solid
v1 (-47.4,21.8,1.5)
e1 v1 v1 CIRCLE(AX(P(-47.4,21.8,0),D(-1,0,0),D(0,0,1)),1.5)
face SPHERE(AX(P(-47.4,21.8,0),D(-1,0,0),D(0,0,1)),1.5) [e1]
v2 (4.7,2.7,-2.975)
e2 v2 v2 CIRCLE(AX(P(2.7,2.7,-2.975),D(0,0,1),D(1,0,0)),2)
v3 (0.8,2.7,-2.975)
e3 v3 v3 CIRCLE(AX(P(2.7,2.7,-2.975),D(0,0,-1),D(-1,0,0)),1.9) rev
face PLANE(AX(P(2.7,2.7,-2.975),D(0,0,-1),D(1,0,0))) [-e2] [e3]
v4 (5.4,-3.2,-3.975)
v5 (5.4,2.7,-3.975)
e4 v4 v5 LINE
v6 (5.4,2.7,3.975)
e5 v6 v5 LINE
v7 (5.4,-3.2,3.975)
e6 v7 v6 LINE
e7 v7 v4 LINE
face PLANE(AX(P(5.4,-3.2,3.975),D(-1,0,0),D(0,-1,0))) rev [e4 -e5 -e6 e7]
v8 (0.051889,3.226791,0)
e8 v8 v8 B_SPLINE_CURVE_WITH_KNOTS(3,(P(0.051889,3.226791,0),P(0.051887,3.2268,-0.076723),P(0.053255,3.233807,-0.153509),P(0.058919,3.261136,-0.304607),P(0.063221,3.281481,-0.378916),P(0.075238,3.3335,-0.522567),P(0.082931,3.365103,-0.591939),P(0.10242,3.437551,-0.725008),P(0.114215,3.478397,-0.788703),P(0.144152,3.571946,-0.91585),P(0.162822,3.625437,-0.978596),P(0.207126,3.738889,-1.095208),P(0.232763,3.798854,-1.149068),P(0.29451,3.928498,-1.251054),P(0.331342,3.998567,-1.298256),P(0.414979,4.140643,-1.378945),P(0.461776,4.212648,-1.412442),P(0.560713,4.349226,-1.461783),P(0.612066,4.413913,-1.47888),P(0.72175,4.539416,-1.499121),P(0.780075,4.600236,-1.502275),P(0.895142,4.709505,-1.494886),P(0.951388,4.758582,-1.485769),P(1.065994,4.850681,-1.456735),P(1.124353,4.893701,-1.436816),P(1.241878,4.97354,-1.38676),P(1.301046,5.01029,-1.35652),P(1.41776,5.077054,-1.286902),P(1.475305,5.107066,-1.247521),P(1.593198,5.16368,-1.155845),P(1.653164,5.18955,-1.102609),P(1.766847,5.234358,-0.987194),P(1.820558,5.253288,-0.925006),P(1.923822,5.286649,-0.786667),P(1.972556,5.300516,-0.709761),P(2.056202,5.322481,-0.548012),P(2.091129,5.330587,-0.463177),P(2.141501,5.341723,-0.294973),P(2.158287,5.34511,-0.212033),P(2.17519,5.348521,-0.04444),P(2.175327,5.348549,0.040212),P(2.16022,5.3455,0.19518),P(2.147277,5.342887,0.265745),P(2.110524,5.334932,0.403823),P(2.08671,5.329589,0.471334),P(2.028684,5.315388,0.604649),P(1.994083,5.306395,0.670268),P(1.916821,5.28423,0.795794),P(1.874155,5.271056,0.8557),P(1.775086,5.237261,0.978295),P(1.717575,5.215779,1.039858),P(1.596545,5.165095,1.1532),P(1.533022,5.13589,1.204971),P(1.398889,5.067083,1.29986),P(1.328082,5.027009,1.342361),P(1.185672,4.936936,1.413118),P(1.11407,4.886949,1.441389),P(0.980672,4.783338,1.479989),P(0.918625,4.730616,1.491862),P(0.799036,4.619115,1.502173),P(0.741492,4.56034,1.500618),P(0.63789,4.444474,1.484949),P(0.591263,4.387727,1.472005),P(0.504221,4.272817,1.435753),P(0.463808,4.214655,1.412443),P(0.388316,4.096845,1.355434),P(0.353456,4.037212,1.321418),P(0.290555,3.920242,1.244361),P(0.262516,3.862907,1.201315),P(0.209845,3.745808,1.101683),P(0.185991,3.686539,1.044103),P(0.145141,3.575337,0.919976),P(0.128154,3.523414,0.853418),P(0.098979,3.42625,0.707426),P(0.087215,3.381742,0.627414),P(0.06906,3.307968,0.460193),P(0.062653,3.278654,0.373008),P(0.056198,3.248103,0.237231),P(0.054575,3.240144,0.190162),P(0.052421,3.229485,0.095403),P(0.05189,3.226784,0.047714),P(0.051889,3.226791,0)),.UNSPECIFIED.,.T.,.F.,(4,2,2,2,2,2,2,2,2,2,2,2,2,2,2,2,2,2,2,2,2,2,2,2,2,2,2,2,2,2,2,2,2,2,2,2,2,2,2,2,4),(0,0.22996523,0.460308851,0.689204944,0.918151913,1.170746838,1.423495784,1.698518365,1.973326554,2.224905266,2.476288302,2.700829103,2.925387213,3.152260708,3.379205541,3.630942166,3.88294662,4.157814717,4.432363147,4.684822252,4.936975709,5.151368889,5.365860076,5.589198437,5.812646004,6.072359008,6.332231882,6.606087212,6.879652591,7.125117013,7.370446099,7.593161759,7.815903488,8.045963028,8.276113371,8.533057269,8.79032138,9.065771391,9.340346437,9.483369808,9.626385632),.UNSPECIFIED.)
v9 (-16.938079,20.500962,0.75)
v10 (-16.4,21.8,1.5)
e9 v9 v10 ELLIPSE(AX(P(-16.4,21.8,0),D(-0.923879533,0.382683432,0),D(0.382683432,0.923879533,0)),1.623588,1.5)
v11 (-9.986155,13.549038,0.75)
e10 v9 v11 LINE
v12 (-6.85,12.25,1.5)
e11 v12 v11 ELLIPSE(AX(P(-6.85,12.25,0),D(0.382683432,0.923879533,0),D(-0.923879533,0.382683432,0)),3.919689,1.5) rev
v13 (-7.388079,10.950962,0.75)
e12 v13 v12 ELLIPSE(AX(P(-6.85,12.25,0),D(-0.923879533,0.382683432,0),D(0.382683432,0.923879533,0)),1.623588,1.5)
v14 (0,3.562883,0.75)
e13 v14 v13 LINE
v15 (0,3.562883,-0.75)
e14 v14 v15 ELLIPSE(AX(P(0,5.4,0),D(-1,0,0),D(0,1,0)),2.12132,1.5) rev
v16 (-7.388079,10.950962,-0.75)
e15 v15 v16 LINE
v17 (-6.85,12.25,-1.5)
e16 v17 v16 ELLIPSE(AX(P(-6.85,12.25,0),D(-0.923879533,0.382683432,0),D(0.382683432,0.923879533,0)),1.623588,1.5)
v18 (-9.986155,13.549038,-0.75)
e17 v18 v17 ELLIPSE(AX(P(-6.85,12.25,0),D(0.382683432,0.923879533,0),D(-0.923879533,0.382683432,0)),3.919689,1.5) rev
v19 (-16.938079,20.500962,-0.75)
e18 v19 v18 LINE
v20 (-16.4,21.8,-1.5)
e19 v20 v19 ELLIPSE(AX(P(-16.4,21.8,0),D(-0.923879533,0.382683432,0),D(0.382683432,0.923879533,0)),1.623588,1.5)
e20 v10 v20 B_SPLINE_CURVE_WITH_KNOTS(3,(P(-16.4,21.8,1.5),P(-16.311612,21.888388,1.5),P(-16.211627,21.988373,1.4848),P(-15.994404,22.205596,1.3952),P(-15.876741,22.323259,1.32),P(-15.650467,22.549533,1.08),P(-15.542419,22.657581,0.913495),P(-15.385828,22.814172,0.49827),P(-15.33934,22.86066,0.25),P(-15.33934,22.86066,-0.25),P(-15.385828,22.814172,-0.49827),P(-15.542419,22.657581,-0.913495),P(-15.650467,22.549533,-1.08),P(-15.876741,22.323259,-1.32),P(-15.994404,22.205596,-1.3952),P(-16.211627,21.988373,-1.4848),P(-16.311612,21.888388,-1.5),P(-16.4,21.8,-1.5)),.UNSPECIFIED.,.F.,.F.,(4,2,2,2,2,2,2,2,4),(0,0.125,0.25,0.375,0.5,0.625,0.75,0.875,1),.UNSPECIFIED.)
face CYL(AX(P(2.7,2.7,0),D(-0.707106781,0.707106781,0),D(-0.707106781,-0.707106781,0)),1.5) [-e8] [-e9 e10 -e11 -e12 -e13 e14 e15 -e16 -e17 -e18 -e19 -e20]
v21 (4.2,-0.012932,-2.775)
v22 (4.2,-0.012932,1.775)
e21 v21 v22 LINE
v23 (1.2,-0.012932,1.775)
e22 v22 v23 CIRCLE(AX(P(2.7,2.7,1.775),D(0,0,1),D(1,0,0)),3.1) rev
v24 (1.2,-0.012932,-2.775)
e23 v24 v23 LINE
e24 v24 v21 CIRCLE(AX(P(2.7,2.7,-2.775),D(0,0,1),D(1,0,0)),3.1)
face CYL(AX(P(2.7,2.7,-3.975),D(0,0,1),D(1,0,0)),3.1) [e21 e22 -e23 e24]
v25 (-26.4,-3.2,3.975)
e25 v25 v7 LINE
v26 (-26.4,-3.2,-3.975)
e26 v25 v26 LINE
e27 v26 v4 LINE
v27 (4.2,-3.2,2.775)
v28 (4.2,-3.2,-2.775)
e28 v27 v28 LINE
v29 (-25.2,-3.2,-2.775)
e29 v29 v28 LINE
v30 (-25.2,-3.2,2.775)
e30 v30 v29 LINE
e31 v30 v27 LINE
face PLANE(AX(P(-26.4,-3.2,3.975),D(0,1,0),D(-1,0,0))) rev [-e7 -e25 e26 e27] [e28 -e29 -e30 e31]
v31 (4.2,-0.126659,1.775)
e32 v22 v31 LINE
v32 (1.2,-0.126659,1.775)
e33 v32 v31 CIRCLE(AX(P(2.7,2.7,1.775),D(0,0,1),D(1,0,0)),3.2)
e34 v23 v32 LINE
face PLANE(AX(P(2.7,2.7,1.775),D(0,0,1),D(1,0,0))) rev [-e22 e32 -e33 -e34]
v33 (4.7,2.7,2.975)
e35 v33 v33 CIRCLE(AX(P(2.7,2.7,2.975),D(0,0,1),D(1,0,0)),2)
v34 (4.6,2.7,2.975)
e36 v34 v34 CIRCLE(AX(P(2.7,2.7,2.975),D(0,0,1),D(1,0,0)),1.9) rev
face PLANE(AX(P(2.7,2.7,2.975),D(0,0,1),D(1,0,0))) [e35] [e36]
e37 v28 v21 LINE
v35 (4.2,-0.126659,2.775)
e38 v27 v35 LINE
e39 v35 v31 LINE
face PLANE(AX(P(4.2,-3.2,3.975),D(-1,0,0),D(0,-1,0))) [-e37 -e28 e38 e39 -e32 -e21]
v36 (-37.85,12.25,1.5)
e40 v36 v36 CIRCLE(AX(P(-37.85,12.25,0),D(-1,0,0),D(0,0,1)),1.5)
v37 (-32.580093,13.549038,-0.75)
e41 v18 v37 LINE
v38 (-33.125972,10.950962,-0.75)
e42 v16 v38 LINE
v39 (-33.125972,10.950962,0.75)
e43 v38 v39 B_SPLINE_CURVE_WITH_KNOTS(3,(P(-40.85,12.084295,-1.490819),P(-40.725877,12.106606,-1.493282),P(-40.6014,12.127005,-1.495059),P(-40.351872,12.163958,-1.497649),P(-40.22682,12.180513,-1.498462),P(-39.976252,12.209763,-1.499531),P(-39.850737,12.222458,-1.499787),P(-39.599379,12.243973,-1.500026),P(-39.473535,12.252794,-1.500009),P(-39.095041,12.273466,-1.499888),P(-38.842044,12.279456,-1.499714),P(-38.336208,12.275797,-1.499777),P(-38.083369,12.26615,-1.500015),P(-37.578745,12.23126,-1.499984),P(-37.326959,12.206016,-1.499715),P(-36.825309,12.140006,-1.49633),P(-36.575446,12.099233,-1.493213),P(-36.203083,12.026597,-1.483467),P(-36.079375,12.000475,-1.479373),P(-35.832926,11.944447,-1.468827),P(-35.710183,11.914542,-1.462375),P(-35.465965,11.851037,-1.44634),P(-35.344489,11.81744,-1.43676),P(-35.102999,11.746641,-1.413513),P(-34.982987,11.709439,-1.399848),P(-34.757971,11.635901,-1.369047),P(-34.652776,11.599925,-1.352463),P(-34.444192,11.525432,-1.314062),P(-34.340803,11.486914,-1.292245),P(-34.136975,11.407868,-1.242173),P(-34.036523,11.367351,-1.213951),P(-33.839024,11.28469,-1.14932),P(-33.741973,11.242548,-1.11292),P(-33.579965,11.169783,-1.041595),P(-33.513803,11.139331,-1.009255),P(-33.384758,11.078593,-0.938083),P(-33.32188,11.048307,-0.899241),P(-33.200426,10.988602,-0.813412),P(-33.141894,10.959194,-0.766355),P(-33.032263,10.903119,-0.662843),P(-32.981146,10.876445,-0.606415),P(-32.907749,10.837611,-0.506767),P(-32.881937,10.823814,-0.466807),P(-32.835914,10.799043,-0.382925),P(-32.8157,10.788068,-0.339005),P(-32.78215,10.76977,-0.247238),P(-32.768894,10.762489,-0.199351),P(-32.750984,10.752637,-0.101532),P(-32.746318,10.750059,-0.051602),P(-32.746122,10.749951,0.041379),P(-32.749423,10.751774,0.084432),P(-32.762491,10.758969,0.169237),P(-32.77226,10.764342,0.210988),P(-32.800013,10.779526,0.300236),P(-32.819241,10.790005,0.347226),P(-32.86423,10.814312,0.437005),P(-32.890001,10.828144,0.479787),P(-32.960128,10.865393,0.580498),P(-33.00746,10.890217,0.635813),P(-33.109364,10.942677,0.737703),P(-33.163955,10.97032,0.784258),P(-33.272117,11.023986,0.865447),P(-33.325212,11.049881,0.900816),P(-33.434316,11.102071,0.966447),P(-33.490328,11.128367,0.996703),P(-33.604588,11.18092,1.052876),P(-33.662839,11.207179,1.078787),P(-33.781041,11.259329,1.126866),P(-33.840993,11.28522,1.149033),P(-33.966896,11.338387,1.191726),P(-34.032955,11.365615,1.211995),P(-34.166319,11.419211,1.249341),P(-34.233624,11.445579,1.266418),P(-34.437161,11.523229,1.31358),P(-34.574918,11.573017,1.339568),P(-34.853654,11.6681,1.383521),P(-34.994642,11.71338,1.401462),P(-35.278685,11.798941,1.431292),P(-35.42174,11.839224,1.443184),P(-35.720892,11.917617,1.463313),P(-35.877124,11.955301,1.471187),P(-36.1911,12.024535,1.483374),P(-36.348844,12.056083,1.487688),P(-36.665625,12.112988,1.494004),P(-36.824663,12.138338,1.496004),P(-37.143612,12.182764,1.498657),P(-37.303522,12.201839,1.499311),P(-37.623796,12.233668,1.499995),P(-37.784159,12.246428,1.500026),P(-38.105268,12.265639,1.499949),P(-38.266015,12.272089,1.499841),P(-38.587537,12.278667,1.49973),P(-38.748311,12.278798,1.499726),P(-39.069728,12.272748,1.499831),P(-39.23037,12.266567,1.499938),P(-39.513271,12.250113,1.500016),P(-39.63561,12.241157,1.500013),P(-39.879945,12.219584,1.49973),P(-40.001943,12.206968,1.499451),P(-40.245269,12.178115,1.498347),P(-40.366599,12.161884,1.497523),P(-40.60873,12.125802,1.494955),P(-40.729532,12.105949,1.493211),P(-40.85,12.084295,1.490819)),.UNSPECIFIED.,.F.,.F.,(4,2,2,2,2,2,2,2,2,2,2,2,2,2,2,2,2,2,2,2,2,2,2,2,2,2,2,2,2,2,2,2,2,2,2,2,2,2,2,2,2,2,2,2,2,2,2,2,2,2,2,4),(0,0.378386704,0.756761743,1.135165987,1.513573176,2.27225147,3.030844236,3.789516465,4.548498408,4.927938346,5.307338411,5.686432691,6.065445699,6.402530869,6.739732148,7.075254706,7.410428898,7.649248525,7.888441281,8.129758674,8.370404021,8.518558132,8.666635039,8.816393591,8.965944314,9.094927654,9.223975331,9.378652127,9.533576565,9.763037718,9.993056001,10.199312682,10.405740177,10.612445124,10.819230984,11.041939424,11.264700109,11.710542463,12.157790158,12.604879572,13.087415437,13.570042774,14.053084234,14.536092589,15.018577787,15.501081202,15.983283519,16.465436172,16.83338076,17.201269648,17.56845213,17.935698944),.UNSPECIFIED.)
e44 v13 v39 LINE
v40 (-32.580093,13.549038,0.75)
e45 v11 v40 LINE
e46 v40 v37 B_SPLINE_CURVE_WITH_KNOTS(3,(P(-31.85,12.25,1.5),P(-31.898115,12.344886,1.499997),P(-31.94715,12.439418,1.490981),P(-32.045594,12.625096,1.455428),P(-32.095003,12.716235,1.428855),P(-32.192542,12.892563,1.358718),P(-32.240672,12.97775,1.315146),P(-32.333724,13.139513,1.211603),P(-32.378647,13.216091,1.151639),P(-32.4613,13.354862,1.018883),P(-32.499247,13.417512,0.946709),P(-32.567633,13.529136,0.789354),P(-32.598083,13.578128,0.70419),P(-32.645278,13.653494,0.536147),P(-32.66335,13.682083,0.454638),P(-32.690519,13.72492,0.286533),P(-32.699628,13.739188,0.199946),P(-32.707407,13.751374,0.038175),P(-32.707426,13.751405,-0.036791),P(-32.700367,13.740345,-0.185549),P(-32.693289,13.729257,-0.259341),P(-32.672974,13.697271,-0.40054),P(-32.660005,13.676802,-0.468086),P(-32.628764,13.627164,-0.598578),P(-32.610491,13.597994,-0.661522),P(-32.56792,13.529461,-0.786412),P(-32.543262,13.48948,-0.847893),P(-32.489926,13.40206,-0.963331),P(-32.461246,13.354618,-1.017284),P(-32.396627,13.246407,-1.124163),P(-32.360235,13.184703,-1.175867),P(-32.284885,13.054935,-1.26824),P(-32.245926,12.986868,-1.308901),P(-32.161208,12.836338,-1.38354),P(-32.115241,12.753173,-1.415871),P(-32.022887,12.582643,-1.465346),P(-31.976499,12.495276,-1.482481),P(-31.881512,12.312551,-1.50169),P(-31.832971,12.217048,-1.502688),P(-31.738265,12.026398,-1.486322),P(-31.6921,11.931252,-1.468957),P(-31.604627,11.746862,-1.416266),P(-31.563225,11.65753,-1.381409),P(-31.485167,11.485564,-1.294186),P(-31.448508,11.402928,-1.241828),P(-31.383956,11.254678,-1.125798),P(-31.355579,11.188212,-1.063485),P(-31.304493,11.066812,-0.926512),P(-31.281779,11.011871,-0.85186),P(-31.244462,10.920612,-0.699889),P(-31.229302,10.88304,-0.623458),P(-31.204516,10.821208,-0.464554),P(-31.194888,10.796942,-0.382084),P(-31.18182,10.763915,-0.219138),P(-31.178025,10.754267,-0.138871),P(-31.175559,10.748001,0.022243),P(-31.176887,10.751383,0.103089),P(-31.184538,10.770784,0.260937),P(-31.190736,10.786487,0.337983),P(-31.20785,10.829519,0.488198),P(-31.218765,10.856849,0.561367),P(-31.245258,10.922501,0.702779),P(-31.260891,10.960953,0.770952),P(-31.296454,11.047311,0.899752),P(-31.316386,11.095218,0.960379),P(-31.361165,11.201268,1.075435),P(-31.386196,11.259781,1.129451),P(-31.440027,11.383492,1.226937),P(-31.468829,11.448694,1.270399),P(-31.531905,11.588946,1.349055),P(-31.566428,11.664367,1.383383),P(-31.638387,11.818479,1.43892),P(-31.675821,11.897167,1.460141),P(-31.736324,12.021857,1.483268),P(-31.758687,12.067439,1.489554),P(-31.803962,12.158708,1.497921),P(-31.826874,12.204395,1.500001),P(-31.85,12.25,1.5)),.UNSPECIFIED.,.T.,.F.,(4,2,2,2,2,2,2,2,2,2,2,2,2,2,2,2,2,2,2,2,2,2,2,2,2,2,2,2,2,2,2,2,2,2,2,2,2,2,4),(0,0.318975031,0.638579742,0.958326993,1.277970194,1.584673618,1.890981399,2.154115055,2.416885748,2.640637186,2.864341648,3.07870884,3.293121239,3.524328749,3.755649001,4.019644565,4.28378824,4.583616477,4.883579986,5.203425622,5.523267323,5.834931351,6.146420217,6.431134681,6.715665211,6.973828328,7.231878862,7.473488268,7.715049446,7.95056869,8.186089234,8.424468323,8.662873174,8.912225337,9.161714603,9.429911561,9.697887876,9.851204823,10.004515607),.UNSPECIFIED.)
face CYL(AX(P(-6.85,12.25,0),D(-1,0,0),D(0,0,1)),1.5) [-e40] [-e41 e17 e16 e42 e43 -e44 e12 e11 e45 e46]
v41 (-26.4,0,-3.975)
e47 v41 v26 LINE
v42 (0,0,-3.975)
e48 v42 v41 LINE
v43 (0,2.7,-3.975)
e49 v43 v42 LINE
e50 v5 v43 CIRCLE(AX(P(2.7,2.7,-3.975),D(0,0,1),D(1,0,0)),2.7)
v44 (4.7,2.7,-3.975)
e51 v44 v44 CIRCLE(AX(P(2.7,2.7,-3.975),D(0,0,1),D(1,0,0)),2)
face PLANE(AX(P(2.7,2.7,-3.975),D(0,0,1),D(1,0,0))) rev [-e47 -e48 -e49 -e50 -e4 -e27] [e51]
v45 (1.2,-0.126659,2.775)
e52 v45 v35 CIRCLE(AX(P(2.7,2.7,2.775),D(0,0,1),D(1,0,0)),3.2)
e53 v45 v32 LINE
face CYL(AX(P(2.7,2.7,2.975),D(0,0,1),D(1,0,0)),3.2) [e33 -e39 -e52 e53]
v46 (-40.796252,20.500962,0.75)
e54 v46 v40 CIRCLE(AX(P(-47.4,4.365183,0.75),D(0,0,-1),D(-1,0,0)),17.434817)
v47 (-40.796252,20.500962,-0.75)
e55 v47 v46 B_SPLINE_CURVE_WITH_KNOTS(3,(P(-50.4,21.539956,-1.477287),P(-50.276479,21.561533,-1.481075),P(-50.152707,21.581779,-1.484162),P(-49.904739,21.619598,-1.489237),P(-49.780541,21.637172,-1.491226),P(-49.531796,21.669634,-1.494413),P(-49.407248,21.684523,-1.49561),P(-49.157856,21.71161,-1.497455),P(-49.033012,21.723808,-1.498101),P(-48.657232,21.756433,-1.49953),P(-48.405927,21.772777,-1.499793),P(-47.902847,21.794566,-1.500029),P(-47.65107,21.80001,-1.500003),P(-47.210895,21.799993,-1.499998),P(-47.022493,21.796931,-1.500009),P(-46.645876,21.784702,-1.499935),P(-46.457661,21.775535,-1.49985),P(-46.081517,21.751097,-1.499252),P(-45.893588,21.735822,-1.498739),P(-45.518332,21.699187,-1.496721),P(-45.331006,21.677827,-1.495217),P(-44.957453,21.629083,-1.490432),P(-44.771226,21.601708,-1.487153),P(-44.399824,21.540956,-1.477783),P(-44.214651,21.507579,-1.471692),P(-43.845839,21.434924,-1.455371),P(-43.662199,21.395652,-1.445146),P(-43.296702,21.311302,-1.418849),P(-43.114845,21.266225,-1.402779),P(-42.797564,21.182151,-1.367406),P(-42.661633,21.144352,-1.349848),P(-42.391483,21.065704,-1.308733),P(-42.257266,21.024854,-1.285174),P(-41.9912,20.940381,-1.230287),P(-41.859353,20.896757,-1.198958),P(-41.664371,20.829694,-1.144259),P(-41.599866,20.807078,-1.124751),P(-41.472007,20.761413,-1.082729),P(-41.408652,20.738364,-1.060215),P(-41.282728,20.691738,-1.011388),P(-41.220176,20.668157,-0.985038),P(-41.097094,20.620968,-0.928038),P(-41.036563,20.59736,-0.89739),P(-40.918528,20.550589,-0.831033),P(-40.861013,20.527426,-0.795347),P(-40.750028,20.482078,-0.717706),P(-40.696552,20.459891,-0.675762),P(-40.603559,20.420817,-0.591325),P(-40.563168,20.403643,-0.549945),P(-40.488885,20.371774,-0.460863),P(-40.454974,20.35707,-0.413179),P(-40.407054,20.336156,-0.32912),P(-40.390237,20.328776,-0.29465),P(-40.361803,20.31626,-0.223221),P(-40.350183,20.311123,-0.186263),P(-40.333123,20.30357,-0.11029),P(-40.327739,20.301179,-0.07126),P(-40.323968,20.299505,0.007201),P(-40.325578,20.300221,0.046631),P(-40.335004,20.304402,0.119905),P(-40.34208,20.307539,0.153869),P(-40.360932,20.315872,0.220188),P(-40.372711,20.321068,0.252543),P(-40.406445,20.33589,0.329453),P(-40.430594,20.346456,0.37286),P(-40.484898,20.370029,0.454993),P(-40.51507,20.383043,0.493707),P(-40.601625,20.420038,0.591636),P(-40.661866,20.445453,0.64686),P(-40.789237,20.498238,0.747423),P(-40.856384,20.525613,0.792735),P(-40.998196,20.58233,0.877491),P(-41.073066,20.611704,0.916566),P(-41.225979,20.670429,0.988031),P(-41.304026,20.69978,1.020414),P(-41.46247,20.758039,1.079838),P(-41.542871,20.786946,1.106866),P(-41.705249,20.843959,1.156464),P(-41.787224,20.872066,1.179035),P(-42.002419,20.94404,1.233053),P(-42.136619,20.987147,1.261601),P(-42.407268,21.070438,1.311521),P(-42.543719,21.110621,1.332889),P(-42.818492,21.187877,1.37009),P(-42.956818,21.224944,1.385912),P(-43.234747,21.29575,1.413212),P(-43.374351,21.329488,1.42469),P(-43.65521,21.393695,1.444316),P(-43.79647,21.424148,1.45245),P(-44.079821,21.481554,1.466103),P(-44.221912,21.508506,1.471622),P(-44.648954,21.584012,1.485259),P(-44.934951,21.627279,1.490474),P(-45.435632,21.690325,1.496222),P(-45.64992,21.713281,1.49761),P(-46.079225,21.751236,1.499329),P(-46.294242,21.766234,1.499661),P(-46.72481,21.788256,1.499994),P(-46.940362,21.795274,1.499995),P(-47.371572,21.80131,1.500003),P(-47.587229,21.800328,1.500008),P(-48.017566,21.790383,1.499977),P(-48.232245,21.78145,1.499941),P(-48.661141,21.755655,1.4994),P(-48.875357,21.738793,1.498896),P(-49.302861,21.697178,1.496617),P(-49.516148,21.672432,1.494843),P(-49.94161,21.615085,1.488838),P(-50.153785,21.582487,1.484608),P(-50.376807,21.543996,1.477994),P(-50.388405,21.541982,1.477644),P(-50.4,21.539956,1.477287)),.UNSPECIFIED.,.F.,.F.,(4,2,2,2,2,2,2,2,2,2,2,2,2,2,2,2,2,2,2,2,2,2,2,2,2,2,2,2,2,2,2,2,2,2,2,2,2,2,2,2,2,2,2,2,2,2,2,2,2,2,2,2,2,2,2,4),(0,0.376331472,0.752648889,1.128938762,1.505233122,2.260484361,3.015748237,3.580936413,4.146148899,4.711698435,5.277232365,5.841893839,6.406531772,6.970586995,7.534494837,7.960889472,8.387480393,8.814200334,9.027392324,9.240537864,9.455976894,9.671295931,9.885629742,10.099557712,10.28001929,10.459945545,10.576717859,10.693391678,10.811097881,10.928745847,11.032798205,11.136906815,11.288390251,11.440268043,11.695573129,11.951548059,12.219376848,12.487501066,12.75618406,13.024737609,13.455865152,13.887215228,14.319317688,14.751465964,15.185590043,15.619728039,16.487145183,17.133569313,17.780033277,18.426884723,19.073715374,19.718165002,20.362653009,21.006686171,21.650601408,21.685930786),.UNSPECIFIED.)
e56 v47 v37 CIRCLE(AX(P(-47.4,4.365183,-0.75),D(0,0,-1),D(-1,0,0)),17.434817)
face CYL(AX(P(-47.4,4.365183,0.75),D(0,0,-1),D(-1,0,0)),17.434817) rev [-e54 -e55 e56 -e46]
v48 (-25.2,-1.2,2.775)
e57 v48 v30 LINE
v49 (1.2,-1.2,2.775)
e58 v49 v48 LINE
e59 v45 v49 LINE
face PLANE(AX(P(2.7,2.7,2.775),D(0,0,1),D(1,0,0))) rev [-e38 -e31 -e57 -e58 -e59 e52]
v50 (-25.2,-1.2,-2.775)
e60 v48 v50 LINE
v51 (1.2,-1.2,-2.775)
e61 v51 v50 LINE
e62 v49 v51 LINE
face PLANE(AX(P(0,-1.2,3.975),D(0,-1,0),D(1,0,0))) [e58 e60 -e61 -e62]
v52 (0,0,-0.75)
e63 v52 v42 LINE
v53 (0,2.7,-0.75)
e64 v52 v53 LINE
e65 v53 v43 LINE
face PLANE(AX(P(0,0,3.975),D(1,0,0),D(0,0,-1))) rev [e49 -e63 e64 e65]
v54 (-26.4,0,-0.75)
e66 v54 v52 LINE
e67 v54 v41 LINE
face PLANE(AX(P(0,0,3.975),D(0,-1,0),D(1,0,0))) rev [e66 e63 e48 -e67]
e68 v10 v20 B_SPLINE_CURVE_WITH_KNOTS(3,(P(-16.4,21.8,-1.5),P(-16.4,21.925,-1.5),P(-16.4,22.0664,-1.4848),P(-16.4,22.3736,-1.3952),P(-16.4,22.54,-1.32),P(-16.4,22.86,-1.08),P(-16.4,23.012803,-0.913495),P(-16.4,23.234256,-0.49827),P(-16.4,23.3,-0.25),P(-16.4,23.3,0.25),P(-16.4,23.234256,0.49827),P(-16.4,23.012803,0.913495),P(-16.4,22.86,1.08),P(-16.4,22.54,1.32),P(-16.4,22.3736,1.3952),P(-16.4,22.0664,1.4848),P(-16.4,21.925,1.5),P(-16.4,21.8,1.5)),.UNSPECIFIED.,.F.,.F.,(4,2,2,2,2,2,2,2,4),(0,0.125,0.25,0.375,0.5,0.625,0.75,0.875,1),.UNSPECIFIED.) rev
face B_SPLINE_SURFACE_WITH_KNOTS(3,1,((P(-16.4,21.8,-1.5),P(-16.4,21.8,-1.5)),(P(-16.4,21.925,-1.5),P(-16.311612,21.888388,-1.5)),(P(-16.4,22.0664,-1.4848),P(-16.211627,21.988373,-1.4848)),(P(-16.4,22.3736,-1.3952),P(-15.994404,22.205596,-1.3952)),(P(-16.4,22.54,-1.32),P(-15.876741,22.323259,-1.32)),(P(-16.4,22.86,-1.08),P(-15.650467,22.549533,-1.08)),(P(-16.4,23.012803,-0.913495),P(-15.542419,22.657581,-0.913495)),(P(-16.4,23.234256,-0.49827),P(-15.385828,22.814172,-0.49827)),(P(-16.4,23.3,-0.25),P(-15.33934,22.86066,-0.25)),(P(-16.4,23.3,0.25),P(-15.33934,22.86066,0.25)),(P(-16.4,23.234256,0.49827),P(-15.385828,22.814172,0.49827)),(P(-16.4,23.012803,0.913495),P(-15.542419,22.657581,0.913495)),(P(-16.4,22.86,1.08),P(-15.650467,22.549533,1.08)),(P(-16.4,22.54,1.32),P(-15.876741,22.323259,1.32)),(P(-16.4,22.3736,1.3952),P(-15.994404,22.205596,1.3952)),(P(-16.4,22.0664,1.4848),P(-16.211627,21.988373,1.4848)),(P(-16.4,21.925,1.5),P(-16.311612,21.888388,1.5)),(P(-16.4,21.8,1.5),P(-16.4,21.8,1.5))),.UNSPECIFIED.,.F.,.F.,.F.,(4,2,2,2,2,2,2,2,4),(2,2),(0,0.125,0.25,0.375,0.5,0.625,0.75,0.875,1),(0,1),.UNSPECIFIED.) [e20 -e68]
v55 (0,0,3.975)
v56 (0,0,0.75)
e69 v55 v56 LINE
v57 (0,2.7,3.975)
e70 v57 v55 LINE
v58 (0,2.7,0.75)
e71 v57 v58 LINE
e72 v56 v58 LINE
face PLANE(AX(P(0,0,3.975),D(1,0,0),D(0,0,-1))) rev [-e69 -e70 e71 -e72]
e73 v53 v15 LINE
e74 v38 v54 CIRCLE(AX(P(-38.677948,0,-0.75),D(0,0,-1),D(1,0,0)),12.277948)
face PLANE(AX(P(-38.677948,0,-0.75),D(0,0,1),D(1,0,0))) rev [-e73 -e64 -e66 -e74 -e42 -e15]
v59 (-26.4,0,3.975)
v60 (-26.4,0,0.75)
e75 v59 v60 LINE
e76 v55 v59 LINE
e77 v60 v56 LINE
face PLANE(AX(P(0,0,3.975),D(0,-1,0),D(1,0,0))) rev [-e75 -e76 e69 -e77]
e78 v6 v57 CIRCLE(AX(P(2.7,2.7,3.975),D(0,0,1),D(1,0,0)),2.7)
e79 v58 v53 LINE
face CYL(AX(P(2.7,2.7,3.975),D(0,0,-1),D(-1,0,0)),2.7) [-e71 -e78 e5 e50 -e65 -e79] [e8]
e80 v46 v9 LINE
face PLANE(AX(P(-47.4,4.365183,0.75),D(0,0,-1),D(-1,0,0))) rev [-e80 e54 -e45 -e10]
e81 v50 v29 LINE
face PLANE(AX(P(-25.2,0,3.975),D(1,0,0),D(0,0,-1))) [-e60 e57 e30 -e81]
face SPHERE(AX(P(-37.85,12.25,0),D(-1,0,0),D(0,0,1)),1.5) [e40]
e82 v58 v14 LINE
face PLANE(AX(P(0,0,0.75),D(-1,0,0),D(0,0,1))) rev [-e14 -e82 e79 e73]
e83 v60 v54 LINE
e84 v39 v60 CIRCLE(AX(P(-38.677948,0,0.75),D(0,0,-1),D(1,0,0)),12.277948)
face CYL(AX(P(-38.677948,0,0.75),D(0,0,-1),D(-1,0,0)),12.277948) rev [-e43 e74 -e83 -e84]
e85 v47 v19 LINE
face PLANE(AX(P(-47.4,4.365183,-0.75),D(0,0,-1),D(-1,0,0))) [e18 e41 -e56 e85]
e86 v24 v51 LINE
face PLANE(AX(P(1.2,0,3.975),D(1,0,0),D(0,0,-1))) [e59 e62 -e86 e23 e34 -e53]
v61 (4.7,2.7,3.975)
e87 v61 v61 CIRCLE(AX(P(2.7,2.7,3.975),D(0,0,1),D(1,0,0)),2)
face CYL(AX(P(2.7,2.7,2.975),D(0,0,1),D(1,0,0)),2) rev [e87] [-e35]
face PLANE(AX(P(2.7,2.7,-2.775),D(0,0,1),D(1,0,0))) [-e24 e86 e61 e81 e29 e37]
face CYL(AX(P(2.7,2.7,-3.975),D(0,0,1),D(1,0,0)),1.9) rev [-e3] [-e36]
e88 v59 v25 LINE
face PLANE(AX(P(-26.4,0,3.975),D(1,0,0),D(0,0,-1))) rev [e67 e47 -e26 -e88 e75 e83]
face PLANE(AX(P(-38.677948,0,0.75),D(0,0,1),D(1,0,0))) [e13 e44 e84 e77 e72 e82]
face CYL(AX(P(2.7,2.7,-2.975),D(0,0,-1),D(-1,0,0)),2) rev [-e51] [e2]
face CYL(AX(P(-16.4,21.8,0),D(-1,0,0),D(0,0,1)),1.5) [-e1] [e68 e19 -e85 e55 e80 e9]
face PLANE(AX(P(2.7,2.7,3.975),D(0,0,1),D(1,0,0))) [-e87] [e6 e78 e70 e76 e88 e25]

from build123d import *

# Parameters (mm, degrees)
BOSS_EXTRUDE1_DEPTH = 3.975
SKETCH2_R           = 1.9
CUT_EXTRUDE1_DEPTH  = 29.094883876
SKETCH3_R           = 2
CUT_EXTRUDE2_DEPTH  = 1
SHELL4_START        = -2.775
SHELL4_DEPTH        = 5.55
SHELL4_2_DEPTH      = 4.55
SWEEP2_PROFILE_R    = 1.5
SWEEP3_PROFILE_R    = 1.5
SWEEP4_PROFILE_R    = 1.5
DOME1_FACE_RADIUS   = 1.5
DOME1_HEIGHT        = 1.5
DOME2_FACE_RADIUS   = 1.5
DOME2_HEIGHT        = 1.5
BOSS_EXTRUDE3_DEPTH = 0.75
BOSS_EXTRUDE4_DEPTH = 0.75
SKETCH63_R          = 1.9
CUT_EXTRUDE4_DEPTH  = 55.747625576


with BuildPart() as part:
    # Sketch1 → Boss-Extrude1 (new, symmetric)
    with BuildSketch(Plane.XY):
        with BuildLine():
            Line((0, 0), (-26.4, 0))
            Line((-26.4, 0), (-26.4, -3.2))
            Line((-26.4, -3.2), (5.4, -3.2))
            Line((5.4, -3.2), (5.4, 2.7))
            ThreePointArc((5.4, 2.7), (2.7, 5.4), (0, 2.7))
            Line((0, 2.7), (0, 0))
        make_face()
    extrude(amount=BOSS_EXTRUDE1_DEPTH, both=True)

    # Sketch2 → Cut-Extrude1 (cut, through all)
    with BuildSketch(Plane.XY.offset(3.975)):
        with Locations((2.7, 2.7)):
            Circle(SKETCH2_R)
    extrude(amount=-CUT_EXTRUDE1_DEPTH, mode=Mode.SUBTRACT)

    # Sketch3 → Cut-Extrude2 (cut)
    with BuildSketch(Plane.XY.offset(3.975)):
        with Locations((2.7, 2.7)):
            Circle(SKETCH3_R)
    cut_extrude2 = extrude(amount=-CUT_EXTRUDE2_DEPTH, mode=Mode.SUBTRACT)

    # Shell4: read off the stored shape, not the designer's step
    # Shell4 outline → Shell4 (cut)
    with BuildSketch(Plane.XY.offset(SHELL4_START)):
        with BuildLine():
            Line((1.2, -0.126658805), (1.2, -1.2))
            Line((1.2, -1.2), (-25.2, -1.2))
            Line((-25.2, -1.2), (-25.2, -3.2))
            Line((-25.2, -3.2), (4.2, -3.2))
            Line((4.2, -3.2), (4.2, -0.126658805))
            ThreePointArc((4.2, -0.126658805), (2.7, -0.5), (1.2, -0.126658805))
        make_face()
    extrude(amount=SHELL4_DEPTH, mode=Mode.SUBTRACT)

    # Shell4 2 outline → Shell4 2 (cut)
    with BuildSketch(Plane.XY.offset(SHELL4_START)):
        with BuildLine():
            Line((1.2, -0.012931993), (1.2, -0.126658805))
            ThreePointArc((1.2, -0.126658805), (2.7, -0.5), (4.2, -0.126658805))
            Line((4.2, -0.126658805), (4.2, -0.012931993))
            ThreePointArc((4.2, -0.012931993), (2.7, -0.4), (1.2, -0.012931993))
        make_face()
    extrude(amount=SHELL4_2_DEPTH, mode=Mode.SUBTRACT)

    # Sweep2: sweep along a path in Sketch14
    with BuildLine(Plane.XY) as sweep2_path:
        Line((2.7, 2.7), (-16.4, 21.8))
    # Sweep2 profile (on start of the path) → Sweep2 (sweep)
    with BuildSketch(Plane(origin=(2.7, 2.7, 0), x_dir=(0.7071067811865488, 0.7071067811865464, 0), z_dir=(-0.7071067811865464, 0.7071067811865488, 0))):
        Circle(SWEEP2_PROFILE_R)
    sweep(path=sweep2_path.line)

    # Mirror1: Cut-Extrude2 across plane
    add(cut_extrude2.mirror(Plane.XY), mode=Mode.SUBTRACT)

    # Sweep3: sweep along a path in Sketch25
    with BuildLine(Plane.XY) as sweep3_path:
        Line((-16.4, 21.8), (-47.4, 21.8))
    # Sweep3 profile (on start of the path) → Sweep3 (sweep)
    with BuildSketch(Plane(origin=(-16.4, 21.8, 0), x_dir=(0, 0, -1), z_dir=(-1, 0, 0))):
        Circle(SWEEP3_PROFILE_R)
    sweep(path=sweep3_path.line)

    # Loft1: read off the stored shape, not the designer's step
    # Loft1: loft between two sections, ruled curve by curve
    loft1_from = [
        Edge.make_bspline([(-16.4, 21.8, -1.5), (-16.4, 21.925, -1.5), (-16.4, 22.0664, -1.4848), (-16.4, 22.3736, -1.3952), (-16.4, 22.54, -1.32), (-16.4, 22.86, -1.08), (-16.4, 23.012802768, -0.91349481), (-16.4, 23.234256055, -0.498269896), (-16.4, 23.3, -0.25), (-16.4, 23.3, 0.25), (-16.4, 23.234256055, 0.498269896), (-16.4, 23.012802768, 0.91349481), (-16.4, 22.86, 1.08), (-16.4, 22.54, 1.32), (-16.4, 22.3736, 1.3952), (-16.4, 22.0664, 1.4848), (-16.4, 21.925, 1.5), (-16.4, 21.8, 1.5)], [0, 0, 0, 0, 0.125, 0.125, 0.25, 0.25, 0.375, 0.375, 0.5, 0.5, 0.625, 0.625, 0.75, 0.75, 0.875, 0.875, 1, 1, 1, 1], 3),
        Edge.make_line((-16.4, 21.8, 1.5), (-16.4, 21.8, -1.5)),
    ]
    loft1_to = [
        Edge.make_bspline([(-16.4, 21.8, -1.5), (-16.311611652, 21.888388348, -1.5), (-16.211626753, 21.988373247, -1.4848), (-15.99440355, 22.20559645, -1.3952), (-15.876740982, 22.323259018, -1.32), (-15.650466812, 22.549533188, -1.08), (-15.542418938, 22.657581062, -0.91349481), (-15.385827817, 22.814172183, -0.498269896), (-15.339339828, 22.860660172, -0.25), (-15.339339828, 22.860660172, 0.25), (-15.385827817, 22.814172183, 0.498269896), (-15.542418938, 22.657581062, 0.91349481), (-15.650466812, 22.549533188, 1.08), (-15.876740982, 22.323259018, 1.32), (-15.99440355, 22.20559645, 1.3952), (-16.211626753, 21.988373247, 1.4848), (-16.311611652, 21.888388348, 1.5), (-16.4, 21.8, 1.5)], [0, 0, 0, 0, 0.125, 0.125, 0.25, 0.25, 0.375, 0.375, 0.5, 0.5, 0.625, 0.625, 0.75, 0.75, 0.875, 0.875, 1, 1, 1, 1], 3),
        Edge.make_line((-16.4, 21.8, 1.5), (-16.4, 21.8, -1.5)),
    ]
    loft1 = Solid(Shell([*[Face.make_surface_from_curves(loft1_from[k], loft1_to[k]) for k in range(2)], Face(Wire(loft1_from)), Face(Wire(loft1_to))]))
    add(loft1)

    # Sweep4: sweep along a path in Sketch40
    with BuildLine(Plane.XY) as sweep4_path:
        Line((-6.85, 12.25), (-37.85, 12.25))
    # Sweep4 profile (on start of the path) → Sweep4 (sweep)
    with BuildSketch(Plane(origin=(-6.85, 12.25, 0), x_dir=(0, 0, -1), z_dir=(-1, 0, 0))):
        Circle(SWEEP4_PROFILE_R)
    sweep(path=sweep4_path.line)

    # Dome1: a dome of height H over a round flat face of radius A is a cap of a sphere of radius (A * A + H * H) / (2 * H)
    dome1_r = (DOME1_FACE_RADIUS * DOME1_FACE_RADIUS + DOME1_HEIGHT * DOME1_HEIGHT) / (2 * DOME1_HEIGHT)
    dome1_base = Plane((-47.4, 21.8, 0), z_dir=(-1, 0, 0))
    with Locations(dome1_base.offset(DOME1_HEIGHT - dome1_r)):
        dome1_ball = Sphere(dome1_r, mode=Mode.PRIVATE)
    add(split(dome1_ball, bisect_by=dome1_base, keep=Keep.TOP, mode=Mode.PRIVATE))

    # Dome2: a dome of height H over a round flat face of radius A is a cap of a sphere of radius (A * A + H * H) / (2 * H)
    dome2_r = (DOME2_FACE_RADIUS * DOME2_FACE_RADIUS + DOME2_HEIGHT * DOME2_HEIGHT) / (2 * DOME2_HEIGHT)
    dome2_base = Plane((-37.85, 12.25, 0), z_dir=(-1, 0, 0))
    with Locations(dome2_base.offset(DOME2_HEIGHT - dome2_r)):
        dome2_ball = Sphere(dome2_r, mode=Mode.PRIVATE)
    add(split(dome2_ball, bisect_by=dome2_base, keep=Keep.TOP, mode=Mode.PRIVATE))

    # Sketch53 → Boss-Extrude3 (add, symmetric)
    with BuildSketch(Plane.XY):
        with BuildLine():
            Line((0, 0), (0, 5.4))
            Line((0, 5.4), (-6.85, 12.25))
            Line((-6.85, 12.25), (-37.85, 12.25))
            ThreePointArc((-37.85, 12.25), (-29.708179083, 8.383987715), (-26.4, 0))
            Line((-26.4, 0), (0, 0))
        make_face()
    extrude(amount=BOSS_EXTRUDE3_DEPTH, both=True)

    # Sketch54 → Boss-Extrude4 (add, symmetric)
    with BuildSketch(Plane.XY):
        with BuildLine():
            Line((-6.85, 12.25), (-16.4, 21.8))
            Line((-16.4, 21.8), (-47.4, 21.8))
            ThreePointArc((-47.4, 21.8), (-38.275787705, 19.221884941), (-31.85, 12.25))
            Line((-31.85, 12.25), (-6.85, 12.25))
        make_face()
    extrude(amount=BOSS_EXTRUDE4_DEPTH, both=True)

    # Sketch63 → Cut-Extrude4 (cut, through all)
    with BuildSketch(Plane.XY.offset(3.975)):
        with Locations((2.7, 2.7)):
            Circle(SKETCH63_R)
    extrude(amount=-CUT_EXTRUDE4_DEPTH, mode=Mode.SUBTRACT)


solid = part.part
